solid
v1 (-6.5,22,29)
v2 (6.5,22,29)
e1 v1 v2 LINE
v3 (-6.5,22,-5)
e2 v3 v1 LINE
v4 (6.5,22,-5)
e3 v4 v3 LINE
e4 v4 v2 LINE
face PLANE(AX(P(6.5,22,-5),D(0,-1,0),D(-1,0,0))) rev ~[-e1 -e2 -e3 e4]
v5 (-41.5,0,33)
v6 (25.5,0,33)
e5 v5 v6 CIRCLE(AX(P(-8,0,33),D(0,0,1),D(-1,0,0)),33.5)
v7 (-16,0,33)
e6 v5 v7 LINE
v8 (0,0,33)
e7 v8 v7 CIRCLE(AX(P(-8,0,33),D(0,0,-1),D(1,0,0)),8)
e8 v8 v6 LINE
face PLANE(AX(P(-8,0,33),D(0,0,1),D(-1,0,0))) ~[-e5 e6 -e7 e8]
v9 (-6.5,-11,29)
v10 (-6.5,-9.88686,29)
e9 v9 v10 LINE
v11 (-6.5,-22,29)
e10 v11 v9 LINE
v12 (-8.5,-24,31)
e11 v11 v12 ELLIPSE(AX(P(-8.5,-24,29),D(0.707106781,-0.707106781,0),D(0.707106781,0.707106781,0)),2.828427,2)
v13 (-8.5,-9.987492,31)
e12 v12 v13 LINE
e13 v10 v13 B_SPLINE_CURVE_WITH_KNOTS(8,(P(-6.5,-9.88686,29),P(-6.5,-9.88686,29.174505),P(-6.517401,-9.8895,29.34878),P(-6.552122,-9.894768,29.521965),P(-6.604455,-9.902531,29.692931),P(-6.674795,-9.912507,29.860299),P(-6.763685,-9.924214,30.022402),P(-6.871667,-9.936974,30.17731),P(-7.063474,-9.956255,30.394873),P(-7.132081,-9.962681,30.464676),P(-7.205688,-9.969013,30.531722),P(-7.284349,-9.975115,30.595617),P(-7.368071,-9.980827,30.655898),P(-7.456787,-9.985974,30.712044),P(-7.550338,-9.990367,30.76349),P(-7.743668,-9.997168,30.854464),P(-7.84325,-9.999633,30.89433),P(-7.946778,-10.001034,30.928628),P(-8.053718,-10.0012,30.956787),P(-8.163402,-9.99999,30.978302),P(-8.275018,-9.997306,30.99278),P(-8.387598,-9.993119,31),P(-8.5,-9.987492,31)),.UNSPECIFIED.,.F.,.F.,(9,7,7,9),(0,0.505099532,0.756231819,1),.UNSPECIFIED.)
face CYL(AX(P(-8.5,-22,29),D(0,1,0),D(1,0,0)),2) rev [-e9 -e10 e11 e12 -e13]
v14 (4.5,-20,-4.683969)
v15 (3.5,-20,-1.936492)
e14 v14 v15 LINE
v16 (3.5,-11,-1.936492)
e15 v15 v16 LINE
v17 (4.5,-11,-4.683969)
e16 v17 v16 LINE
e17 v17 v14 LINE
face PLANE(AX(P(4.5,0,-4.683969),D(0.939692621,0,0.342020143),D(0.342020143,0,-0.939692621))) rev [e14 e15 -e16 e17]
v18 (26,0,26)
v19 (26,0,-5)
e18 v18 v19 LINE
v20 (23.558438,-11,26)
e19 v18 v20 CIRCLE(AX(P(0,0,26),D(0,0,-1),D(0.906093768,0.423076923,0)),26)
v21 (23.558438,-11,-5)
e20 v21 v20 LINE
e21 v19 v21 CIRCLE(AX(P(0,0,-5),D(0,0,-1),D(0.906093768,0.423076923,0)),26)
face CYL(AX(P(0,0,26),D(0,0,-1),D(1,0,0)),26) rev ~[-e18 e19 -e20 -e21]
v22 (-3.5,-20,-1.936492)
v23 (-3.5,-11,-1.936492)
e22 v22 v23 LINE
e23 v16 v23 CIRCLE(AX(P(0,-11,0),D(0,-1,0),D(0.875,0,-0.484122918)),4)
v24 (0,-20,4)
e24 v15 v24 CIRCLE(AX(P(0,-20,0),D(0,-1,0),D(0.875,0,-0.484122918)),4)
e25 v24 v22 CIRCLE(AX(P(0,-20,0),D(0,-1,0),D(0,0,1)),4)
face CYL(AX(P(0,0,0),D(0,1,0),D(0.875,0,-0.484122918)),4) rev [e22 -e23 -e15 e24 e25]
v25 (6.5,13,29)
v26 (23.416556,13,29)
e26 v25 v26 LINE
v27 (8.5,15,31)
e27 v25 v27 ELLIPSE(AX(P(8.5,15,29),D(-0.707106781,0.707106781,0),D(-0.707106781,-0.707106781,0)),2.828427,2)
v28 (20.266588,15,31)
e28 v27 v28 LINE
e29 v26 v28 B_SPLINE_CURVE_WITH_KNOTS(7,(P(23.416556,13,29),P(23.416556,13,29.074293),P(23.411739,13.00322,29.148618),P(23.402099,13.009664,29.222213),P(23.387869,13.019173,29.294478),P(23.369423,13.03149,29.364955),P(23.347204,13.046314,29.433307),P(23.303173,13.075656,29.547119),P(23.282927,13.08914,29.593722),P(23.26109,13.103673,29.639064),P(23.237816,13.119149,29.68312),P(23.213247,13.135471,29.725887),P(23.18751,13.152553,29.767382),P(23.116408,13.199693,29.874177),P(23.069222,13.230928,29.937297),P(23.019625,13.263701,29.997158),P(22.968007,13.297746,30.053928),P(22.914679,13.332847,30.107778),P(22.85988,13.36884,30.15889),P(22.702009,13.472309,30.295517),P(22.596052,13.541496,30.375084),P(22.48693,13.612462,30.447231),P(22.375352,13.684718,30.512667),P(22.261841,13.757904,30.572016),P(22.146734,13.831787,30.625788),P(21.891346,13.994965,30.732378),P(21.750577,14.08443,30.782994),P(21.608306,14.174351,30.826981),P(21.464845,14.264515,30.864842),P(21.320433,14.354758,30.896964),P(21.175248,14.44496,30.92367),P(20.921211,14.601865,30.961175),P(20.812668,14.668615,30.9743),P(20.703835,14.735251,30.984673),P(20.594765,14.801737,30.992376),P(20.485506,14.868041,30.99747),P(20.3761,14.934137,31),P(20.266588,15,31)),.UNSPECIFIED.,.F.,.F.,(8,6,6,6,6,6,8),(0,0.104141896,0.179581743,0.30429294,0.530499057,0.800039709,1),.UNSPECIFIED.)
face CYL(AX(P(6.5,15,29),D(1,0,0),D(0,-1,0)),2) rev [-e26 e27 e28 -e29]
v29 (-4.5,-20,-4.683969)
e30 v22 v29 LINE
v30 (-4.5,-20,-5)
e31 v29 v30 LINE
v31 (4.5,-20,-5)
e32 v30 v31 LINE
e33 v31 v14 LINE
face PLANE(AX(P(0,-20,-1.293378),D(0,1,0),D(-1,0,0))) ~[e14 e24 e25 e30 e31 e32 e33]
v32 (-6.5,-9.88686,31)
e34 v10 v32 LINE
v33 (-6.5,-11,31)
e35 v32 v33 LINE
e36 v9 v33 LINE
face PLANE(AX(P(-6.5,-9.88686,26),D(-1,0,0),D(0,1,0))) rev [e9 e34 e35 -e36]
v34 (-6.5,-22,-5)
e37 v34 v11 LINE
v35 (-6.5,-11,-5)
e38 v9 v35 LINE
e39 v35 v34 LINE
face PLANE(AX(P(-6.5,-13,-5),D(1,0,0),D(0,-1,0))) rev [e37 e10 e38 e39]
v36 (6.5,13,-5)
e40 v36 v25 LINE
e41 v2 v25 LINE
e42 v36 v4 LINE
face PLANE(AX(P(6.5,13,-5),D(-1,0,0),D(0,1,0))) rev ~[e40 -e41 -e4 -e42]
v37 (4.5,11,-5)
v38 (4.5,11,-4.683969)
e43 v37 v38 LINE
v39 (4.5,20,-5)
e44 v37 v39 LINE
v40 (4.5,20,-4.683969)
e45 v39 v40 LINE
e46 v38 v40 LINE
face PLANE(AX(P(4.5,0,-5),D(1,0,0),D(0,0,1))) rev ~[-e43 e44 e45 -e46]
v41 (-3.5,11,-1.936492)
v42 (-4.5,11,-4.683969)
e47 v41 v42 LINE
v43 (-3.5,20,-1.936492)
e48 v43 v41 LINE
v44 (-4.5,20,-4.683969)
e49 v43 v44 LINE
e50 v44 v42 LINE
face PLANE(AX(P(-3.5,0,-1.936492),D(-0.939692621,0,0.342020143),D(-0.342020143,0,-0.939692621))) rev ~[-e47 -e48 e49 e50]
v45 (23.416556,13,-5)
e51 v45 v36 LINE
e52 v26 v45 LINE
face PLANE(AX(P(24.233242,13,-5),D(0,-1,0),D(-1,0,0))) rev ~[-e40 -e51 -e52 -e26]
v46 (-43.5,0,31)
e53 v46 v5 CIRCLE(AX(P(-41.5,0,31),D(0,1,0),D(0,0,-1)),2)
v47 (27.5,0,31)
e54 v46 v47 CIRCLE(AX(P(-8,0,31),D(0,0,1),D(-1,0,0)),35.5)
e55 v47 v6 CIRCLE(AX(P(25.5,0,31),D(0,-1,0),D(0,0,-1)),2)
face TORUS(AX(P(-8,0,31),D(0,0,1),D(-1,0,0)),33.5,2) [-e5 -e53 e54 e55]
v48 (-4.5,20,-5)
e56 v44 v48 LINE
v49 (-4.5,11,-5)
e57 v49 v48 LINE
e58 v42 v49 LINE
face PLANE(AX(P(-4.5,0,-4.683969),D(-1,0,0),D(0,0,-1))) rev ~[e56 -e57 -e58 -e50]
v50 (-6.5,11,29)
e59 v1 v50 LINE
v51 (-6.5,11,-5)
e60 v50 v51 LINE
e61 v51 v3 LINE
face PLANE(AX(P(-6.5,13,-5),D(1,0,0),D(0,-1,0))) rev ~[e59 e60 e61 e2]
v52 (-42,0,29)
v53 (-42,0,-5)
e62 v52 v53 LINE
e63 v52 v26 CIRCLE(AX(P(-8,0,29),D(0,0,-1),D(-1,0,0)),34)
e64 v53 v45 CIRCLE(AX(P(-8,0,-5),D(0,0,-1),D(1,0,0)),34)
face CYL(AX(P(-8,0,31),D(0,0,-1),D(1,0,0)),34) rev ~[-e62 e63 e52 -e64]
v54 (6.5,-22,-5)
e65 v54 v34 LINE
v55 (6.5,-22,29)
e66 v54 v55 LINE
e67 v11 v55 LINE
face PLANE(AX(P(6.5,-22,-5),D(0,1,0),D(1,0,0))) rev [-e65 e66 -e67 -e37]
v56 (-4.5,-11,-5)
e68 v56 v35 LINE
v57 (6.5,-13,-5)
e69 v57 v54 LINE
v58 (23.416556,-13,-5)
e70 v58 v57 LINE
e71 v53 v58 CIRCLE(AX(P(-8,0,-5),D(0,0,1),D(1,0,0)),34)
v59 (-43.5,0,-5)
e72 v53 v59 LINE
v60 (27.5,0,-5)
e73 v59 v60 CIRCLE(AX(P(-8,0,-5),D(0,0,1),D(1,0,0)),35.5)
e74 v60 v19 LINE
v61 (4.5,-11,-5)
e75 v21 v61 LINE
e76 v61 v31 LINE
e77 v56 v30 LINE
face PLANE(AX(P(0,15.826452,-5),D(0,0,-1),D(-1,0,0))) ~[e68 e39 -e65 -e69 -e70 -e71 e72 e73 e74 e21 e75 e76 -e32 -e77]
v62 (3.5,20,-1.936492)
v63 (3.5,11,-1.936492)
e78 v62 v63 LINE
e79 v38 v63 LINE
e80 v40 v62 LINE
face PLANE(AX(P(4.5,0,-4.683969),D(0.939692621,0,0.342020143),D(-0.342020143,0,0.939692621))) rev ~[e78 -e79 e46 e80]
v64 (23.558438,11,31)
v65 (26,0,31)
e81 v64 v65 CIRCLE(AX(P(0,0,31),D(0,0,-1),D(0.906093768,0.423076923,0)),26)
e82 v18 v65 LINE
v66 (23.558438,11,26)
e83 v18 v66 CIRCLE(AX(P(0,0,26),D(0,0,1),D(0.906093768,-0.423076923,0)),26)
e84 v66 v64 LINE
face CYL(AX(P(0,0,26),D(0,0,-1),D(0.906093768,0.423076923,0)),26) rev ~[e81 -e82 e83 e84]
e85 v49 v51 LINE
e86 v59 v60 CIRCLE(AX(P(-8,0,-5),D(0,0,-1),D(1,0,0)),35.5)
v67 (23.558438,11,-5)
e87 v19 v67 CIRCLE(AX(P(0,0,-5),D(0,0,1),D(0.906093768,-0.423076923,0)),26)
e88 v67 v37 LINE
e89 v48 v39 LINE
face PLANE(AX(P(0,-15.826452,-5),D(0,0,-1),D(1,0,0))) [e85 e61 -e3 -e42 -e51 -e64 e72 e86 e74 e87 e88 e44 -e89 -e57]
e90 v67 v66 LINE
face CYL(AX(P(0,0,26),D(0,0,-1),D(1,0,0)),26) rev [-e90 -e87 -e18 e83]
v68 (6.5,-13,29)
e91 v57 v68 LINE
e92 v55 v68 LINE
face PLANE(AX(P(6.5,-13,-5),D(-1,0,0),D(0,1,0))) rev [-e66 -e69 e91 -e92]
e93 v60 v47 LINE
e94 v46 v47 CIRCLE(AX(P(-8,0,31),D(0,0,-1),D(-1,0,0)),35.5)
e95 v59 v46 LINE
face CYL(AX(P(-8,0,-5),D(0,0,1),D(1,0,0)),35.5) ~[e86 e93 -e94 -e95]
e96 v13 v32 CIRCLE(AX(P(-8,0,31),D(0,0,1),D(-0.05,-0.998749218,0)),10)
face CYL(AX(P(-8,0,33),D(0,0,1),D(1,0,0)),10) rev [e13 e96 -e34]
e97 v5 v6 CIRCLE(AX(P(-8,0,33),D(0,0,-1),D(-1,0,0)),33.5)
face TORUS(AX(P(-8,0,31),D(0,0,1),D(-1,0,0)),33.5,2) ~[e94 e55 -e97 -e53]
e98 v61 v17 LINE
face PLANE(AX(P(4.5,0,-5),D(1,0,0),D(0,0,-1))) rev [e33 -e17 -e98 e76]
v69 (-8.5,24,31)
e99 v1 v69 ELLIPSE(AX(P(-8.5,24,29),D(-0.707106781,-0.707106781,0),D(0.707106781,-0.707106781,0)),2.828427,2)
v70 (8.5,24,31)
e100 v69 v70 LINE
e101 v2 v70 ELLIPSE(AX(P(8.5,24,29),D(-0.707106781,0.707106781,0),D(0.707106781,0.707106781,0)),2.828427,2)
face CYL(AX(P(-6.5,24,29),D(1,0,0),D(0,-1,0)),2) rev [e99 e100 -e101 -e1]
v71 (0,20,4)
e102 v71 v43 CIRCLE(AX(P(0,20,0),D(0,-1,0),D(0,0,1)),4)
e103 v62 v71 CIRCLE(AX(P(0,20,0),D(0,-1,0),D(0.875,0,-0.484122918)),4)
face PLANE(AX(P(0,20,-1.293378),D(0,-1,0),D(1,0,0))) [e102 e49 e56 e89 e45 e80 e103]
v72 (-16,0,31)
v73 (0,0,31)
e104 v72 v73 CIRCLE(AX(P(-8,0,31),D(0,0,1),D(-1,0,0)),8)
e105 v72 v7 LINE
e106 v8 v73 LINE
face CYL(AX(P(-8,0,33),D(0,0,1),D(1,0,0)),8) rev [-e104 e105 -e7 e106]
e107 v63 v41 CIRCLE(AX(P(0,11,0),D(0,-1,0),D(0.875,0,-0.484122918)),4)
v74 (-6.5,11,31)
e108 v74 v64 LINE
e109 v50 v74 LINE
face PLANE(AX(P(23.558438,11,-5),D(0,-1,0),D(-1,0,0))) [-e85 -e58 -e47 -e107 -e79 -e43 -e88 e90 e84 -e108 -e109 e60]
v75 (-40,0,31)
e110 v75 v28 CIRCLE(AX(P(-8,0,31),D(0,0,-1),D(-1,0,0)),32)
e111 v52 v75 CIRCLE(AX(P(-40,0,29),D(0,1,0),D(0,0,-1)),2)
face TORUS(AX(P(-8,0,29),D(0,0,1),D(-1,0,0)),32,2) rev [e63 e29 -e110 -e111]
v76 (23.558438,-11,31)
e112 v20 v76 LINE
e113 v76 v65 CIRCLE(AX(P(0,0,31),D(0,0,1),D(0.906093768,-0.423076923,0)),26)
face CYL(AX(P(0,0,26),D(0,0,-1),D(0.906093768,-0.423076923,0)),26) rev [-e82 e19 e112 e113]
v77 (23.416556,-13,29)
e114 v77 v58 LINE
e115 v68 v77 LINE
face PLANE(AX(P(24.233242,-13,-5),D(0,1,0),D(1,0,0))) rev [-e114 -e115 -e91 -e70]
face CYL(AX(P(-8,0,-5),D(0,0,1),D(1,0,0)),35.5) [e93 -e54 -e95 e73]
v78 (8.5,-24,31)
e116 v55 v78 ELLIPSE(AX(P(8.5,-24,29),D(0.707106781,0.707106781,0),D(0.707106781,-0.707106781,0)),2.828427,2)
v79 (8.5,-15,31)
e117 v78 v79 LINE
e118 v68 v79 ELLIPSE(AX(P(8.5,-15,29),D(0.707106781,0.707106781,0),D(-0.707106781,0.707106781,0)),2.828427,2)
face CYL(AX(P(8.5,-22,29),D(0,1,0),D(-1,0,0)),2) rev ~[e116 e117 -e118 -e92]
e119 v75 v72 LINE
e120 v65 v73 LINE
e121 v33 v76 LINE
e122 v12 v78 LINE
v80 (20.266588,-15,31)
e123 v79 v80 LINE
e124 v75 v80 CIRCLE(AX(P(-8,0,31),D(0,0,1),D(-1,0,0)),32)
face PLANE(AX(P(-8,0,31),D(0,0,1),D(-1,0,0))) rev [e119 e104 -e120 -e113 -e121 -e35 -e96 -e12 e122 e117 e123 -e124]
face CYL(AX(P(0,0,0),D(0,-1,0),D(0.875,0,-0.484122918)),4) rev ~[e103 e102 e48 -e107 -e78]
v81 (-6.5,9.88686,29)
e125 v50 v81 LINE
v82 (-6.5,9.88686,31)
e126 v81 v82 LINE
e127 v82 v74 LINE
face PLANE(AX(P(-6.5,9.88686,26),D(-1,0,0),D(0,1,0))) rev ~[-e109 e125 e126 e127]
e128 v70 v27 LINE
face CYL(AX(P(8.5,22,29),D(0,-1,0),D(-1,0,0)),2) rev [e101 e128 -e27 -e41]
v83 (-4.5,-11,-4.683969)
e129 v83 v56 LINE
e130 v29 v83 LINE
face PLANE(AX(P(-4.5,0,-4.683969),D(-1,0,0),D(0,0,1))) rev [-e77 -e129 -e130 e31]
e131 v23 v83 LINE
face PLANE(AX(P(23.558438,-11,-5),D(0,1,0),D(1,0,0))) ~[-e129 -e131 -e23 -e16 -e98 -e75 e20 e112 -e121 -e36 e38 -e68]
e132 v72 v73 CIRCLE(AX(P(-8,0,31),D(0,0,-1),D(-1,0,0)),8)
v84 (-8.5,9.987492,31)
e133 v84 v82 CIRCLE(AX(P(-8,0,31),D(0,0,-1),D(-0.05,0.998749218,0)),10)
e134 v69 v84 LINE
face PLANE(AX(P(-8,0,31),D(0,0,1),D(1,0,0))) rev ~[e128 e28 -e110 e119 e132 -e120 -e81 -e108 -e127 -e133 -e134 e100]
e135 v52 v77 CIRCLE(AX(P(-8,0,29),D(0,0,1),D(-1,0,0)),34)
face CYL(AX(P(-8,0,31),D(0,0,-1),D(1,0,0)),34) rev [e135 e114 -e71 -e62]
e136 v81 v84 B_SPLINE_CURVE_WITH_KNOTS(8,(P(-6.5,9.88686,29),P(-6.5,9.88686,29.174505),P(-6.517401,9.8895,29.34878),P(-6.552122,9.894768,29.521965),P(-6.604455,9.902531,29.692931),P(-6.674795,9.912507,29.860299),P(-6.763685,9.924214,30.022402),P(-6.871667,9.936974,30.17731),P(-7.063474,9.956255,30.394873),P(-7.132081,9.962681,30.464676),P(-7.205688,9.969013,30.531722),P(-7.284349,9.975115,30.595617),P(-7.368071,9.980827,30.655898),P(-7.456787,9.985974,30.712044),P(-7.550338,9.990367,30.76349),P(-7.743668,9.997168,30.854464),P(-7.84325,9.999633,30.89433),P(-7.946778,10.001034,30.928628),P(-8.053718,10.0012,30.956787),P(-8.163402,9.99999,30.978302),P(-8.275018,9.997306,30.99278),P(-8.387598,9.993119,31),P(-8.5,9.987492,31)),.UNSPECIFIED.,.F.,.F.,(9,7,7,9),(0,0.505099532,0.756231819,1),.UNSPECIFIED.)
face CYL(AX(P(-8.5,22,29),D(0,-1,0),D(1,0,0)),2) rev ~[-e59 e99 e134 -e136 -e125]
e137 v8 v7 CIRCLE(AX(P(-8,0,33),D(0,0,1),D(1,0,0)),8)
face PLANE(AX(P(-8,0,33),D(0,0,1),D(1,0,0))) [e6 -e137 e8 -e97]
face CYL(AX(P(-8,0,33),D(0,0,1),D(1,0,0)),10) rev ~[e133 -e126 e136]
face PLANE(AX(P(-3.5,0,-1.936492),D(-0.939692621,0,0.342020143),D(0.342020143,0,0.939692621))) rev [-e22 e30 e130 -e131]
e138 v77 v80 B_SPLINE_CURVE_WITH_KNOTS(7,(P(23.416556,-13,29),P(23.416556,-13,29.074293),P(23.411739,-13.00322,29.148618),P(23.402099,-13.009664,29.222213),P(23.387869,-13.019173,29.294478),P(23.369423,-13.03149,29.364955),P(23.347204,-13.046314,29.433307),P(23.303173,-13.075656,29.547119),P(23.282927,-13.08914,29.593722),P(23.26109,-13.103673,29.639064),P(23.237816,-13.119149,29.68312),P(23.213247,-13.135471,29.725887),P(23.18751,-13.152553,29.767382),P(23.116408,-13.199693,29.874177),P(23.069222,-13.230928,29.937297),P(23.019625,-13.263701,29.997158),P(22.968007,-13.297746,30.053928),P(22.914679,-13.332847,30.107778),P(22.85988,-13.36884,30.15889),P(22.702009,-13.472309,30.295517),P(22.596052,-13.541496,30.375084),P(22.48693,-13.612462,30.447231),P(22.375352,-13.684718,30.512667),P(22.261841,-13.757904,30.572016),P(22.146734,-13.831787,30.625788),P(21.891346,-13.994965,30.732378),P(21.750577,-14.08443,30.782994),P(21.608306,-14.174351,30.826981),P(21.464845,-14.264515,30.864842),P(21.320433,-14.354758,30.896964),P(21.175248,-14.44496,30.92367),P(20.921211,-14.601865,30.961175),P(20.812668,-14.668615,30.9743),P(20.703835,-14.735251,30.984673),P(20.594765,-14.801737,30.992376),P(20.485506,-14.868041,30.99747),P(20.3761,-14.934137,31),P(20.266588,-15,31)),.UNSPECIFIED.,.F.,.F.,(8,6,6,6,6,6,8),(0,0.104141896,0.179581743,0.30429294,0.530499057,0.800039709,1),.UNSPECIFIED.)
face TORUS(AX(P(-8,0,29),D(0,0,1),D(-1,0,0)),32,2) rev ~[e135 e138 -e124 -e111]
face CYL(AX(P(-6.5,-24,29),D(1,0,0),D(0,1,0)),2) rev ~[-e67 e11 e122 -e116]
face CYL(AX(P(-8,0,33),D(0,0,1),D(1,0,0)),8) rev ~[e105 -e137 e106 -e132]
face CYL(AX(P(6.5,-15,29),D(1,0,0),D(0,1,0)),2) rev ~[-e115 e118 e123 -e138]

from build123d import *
from build123d import SkipClean  # not in build123d's __all__

# Parameters (mm, degrees)
F3_DEPTH  = 36
F5_DEPTH  = 20
F7_DEPTH  = 36.001
F10_R     = 10
F11_DEPTH = 7
F12_R     = 10
F12_R_2   = 8
F13_DEPTH = 2
F14_W     = 113.5210208595
F14_H     = 51.0865971446
F15_DEPTH = 38.001
F16_W     = 26.7383140922
F16_H     = 24.3122323528
F17_DEPTH = 36
F18_R     = 2
F20_DEPTH = 5


with BuildPart() as f1:
    # F0 (on Front) → F1 (revolve)
    with BuildSketch(Plane.XZ):
        Polygon((26, -5), (27.5, -5), (27.5, 31), (0, 31), (0, 26), (26, 26), (26, 0), align=None)
    revolve(axis=Axis((0, 0, 28.5), (0, 0, 1)))

    # F2 (on face) → F3 (join, through all)
    with BuildSketch(Plane(origin=(0, 0, -5), x_dir=(1, 0, 0), z_dir=(0, 0, -1))):
        with BuildLine():
            Line((-23.5584379788, 11), (23.5584379788, 11))
            ThreePointArc((23.5584379788, 11), (0, 26), (-23.5584379788, 11))
        make_face()
        with BuildLine():
            Line((23.5584379788, -11), (-23.5584379788, -11))
            ThreePointArc((-23.5584379788, -11), (0, -26), (23.5584379788, -11))
        make_face()
    extrude(amount=-F3_DEPTH)

    # F4 (on Front) → F5 (cut, symmetric)
    with BuildSketch(Plane.XZ):
        with BuildLine():
            Line((4.5, -4.6839690926), (3.5, -1.9364916731))
            ThreePointArc((3.5, -1.9364916731), (3.4457195687, 2.0315060063), (0, 4))
            ThreePointArc((0, 4), (-3.4457195687, 2.0315060063), (-3.5, -1.9364916731))
            Line((-3.5, -1.9364916731), (-4.5, -4.6839690926))
            Line((-4.5, -4.6839690926), (-4.5, -5))
            Line((-4.5, -5), (0, -5))
            Line((0, -5), (4.5, -5))
            Line((4.5, -5), (4.5, -4.6839690926))
        make_face()
    extrude(amount=F5_DEPTH, both=True, mode=Mode.SUBTRACT)

    # F6 (on face) → F7 (cut, through all)
    with BuildSketch(Plane(origin=(0, 0, -5), x_dir=(1, 0, 0), z_dir=(0, 0, -1))):
        with BuildLine():
            Line((24.2332416321, -13), (6.5, -13))
            Line((6.5, -13), (6.5, -22))
            Line((6.5, -22), (-6.5, -22))
            Line((-6.5, -22), (-6.5, -13))
            Line((-6.5, -13), (-24.2332416321, -13))
            ThreePointArc((-24.2332416321, -13), (0, -27.5), (24.2332416321, -13))
        make_face()
        with BuildLine():
            Line((6.5, 22), (6.5, 13))
            Line((6.5, 13), (24.2332416321, 13))
            ThreePointArc((24.2332416321, 13), (0, 27.5), (-24.2332416321, 13))
            Line((-24.2332416321, 13), (-6.5, 13))
            Line((-6.5, 13), (-6.5, 22))
            Line((-6.5, 22), (6.5, 22))
        make_face()
    extrude(amount=-F7_DEPTH, mode=Mode.SUBTRACT)

    # F8 (on Front) → F9 (revolve)
    with BuildSketch(Plane.XZ):
        Polygon((26, -5), (27.5, -5), (27.5, 33), (-8, 33), (-8, 31), (26, 31), align=None)
    revolve(axis=Axis((-8, 0, 32), (0, 0, -1)))

    # F10 (on face) → F11 (cut, through all)
    with BuildSketch(Plane.XY.offset(33)):
        with Locations((-8, 0)):
            Circle(F10_R)
    extrude(amount=-F11_DEPTH, mode=Mode.SUBTRACT)

    # F12 (on face) → F13 (join)
    with BuildSketch(Plane.XY.offset(33)):
        with Locations((-8, 0)):
            Circle(F12_R)
        with Locations((-8, 0)):
            Circle(F12_R_2, mode=Mode.SUBTRACT)
    extrude(amount=-F13_DEPTH)

    # F14 (on face) → F15 (cut, through all)
    with BuildSketch(Plane.XY.offset(33)):
        with Locations((0.0438708812, -25.5432985723)):
            Rectangle(F14_W, F14_H)
    extrude(amount=-F15_DEPTH, mode=Mode.SUBTRACT)

    # F16 (on face) → F17 (cut, through all)
    with BuildSketch(Plane(origin=(0, 0, -5), x_dir=(1, 0, 0), z_dir=(0, 0, -1))):
        with Locations((-19.8691570461, -0.8438838236)):
            Rectangle(F16_W, F16_H)
    extrude(amount=-F17_DEPTH, mode=Mode.SUBTRACT)

    # F18
    f18_edges = [f1.edges().sort_by_distance(p)[0] for p in [
        (-14.627107, 33.347885, 31),
        (-8, 35.5, 33),
        (-6.5, 15.94343, 31),
        (0, 22, 31),
        (6.5, 17.5, 31),
        (14.958278, 13, 31),
    ]]
    fillet(f18_edges, radius=F18_R)

    # F19 (on face) → F20 (cut, through all)
    with BuildSketch(Plane(origin=(0, 0, 26), x_dir=(1, 0, 0), z_dir=(0, 0, -1))):
        with BuildLine():
            ThreePointArc((2, 0), (-0.4171245559, -6.5192024052), (-6.5, -9.8868599666))
            Line((-6.5, -9.8868599666), (-6.5, -11))
            Line((-6.5, -11), (23.5584379788, -11))
            ThreePointArc((23.5584379788, -11), (25.3822712483, -5.6338535902), (26, 0))
            Line((26, 0), (2, 0))
        make_face()
    extrude(amount=-F20_DEPTH, mode=Mode.SUBTRACT)

    # F21: F1 across face


with BuildPart() as f1_1:
    add(f1.part, clean=False)
    with SkipClean():  # cleaning this boolean's faces spoils the solid; the shape is the same uncleaned
        add(f1.part.mirror(Plane(origin=(-36.1785540273, 0, 22.5714053698), x_dir=(1, 0, 0), z_dir=(0, -1, 0))), clean=False)


solid = f1_1.part
